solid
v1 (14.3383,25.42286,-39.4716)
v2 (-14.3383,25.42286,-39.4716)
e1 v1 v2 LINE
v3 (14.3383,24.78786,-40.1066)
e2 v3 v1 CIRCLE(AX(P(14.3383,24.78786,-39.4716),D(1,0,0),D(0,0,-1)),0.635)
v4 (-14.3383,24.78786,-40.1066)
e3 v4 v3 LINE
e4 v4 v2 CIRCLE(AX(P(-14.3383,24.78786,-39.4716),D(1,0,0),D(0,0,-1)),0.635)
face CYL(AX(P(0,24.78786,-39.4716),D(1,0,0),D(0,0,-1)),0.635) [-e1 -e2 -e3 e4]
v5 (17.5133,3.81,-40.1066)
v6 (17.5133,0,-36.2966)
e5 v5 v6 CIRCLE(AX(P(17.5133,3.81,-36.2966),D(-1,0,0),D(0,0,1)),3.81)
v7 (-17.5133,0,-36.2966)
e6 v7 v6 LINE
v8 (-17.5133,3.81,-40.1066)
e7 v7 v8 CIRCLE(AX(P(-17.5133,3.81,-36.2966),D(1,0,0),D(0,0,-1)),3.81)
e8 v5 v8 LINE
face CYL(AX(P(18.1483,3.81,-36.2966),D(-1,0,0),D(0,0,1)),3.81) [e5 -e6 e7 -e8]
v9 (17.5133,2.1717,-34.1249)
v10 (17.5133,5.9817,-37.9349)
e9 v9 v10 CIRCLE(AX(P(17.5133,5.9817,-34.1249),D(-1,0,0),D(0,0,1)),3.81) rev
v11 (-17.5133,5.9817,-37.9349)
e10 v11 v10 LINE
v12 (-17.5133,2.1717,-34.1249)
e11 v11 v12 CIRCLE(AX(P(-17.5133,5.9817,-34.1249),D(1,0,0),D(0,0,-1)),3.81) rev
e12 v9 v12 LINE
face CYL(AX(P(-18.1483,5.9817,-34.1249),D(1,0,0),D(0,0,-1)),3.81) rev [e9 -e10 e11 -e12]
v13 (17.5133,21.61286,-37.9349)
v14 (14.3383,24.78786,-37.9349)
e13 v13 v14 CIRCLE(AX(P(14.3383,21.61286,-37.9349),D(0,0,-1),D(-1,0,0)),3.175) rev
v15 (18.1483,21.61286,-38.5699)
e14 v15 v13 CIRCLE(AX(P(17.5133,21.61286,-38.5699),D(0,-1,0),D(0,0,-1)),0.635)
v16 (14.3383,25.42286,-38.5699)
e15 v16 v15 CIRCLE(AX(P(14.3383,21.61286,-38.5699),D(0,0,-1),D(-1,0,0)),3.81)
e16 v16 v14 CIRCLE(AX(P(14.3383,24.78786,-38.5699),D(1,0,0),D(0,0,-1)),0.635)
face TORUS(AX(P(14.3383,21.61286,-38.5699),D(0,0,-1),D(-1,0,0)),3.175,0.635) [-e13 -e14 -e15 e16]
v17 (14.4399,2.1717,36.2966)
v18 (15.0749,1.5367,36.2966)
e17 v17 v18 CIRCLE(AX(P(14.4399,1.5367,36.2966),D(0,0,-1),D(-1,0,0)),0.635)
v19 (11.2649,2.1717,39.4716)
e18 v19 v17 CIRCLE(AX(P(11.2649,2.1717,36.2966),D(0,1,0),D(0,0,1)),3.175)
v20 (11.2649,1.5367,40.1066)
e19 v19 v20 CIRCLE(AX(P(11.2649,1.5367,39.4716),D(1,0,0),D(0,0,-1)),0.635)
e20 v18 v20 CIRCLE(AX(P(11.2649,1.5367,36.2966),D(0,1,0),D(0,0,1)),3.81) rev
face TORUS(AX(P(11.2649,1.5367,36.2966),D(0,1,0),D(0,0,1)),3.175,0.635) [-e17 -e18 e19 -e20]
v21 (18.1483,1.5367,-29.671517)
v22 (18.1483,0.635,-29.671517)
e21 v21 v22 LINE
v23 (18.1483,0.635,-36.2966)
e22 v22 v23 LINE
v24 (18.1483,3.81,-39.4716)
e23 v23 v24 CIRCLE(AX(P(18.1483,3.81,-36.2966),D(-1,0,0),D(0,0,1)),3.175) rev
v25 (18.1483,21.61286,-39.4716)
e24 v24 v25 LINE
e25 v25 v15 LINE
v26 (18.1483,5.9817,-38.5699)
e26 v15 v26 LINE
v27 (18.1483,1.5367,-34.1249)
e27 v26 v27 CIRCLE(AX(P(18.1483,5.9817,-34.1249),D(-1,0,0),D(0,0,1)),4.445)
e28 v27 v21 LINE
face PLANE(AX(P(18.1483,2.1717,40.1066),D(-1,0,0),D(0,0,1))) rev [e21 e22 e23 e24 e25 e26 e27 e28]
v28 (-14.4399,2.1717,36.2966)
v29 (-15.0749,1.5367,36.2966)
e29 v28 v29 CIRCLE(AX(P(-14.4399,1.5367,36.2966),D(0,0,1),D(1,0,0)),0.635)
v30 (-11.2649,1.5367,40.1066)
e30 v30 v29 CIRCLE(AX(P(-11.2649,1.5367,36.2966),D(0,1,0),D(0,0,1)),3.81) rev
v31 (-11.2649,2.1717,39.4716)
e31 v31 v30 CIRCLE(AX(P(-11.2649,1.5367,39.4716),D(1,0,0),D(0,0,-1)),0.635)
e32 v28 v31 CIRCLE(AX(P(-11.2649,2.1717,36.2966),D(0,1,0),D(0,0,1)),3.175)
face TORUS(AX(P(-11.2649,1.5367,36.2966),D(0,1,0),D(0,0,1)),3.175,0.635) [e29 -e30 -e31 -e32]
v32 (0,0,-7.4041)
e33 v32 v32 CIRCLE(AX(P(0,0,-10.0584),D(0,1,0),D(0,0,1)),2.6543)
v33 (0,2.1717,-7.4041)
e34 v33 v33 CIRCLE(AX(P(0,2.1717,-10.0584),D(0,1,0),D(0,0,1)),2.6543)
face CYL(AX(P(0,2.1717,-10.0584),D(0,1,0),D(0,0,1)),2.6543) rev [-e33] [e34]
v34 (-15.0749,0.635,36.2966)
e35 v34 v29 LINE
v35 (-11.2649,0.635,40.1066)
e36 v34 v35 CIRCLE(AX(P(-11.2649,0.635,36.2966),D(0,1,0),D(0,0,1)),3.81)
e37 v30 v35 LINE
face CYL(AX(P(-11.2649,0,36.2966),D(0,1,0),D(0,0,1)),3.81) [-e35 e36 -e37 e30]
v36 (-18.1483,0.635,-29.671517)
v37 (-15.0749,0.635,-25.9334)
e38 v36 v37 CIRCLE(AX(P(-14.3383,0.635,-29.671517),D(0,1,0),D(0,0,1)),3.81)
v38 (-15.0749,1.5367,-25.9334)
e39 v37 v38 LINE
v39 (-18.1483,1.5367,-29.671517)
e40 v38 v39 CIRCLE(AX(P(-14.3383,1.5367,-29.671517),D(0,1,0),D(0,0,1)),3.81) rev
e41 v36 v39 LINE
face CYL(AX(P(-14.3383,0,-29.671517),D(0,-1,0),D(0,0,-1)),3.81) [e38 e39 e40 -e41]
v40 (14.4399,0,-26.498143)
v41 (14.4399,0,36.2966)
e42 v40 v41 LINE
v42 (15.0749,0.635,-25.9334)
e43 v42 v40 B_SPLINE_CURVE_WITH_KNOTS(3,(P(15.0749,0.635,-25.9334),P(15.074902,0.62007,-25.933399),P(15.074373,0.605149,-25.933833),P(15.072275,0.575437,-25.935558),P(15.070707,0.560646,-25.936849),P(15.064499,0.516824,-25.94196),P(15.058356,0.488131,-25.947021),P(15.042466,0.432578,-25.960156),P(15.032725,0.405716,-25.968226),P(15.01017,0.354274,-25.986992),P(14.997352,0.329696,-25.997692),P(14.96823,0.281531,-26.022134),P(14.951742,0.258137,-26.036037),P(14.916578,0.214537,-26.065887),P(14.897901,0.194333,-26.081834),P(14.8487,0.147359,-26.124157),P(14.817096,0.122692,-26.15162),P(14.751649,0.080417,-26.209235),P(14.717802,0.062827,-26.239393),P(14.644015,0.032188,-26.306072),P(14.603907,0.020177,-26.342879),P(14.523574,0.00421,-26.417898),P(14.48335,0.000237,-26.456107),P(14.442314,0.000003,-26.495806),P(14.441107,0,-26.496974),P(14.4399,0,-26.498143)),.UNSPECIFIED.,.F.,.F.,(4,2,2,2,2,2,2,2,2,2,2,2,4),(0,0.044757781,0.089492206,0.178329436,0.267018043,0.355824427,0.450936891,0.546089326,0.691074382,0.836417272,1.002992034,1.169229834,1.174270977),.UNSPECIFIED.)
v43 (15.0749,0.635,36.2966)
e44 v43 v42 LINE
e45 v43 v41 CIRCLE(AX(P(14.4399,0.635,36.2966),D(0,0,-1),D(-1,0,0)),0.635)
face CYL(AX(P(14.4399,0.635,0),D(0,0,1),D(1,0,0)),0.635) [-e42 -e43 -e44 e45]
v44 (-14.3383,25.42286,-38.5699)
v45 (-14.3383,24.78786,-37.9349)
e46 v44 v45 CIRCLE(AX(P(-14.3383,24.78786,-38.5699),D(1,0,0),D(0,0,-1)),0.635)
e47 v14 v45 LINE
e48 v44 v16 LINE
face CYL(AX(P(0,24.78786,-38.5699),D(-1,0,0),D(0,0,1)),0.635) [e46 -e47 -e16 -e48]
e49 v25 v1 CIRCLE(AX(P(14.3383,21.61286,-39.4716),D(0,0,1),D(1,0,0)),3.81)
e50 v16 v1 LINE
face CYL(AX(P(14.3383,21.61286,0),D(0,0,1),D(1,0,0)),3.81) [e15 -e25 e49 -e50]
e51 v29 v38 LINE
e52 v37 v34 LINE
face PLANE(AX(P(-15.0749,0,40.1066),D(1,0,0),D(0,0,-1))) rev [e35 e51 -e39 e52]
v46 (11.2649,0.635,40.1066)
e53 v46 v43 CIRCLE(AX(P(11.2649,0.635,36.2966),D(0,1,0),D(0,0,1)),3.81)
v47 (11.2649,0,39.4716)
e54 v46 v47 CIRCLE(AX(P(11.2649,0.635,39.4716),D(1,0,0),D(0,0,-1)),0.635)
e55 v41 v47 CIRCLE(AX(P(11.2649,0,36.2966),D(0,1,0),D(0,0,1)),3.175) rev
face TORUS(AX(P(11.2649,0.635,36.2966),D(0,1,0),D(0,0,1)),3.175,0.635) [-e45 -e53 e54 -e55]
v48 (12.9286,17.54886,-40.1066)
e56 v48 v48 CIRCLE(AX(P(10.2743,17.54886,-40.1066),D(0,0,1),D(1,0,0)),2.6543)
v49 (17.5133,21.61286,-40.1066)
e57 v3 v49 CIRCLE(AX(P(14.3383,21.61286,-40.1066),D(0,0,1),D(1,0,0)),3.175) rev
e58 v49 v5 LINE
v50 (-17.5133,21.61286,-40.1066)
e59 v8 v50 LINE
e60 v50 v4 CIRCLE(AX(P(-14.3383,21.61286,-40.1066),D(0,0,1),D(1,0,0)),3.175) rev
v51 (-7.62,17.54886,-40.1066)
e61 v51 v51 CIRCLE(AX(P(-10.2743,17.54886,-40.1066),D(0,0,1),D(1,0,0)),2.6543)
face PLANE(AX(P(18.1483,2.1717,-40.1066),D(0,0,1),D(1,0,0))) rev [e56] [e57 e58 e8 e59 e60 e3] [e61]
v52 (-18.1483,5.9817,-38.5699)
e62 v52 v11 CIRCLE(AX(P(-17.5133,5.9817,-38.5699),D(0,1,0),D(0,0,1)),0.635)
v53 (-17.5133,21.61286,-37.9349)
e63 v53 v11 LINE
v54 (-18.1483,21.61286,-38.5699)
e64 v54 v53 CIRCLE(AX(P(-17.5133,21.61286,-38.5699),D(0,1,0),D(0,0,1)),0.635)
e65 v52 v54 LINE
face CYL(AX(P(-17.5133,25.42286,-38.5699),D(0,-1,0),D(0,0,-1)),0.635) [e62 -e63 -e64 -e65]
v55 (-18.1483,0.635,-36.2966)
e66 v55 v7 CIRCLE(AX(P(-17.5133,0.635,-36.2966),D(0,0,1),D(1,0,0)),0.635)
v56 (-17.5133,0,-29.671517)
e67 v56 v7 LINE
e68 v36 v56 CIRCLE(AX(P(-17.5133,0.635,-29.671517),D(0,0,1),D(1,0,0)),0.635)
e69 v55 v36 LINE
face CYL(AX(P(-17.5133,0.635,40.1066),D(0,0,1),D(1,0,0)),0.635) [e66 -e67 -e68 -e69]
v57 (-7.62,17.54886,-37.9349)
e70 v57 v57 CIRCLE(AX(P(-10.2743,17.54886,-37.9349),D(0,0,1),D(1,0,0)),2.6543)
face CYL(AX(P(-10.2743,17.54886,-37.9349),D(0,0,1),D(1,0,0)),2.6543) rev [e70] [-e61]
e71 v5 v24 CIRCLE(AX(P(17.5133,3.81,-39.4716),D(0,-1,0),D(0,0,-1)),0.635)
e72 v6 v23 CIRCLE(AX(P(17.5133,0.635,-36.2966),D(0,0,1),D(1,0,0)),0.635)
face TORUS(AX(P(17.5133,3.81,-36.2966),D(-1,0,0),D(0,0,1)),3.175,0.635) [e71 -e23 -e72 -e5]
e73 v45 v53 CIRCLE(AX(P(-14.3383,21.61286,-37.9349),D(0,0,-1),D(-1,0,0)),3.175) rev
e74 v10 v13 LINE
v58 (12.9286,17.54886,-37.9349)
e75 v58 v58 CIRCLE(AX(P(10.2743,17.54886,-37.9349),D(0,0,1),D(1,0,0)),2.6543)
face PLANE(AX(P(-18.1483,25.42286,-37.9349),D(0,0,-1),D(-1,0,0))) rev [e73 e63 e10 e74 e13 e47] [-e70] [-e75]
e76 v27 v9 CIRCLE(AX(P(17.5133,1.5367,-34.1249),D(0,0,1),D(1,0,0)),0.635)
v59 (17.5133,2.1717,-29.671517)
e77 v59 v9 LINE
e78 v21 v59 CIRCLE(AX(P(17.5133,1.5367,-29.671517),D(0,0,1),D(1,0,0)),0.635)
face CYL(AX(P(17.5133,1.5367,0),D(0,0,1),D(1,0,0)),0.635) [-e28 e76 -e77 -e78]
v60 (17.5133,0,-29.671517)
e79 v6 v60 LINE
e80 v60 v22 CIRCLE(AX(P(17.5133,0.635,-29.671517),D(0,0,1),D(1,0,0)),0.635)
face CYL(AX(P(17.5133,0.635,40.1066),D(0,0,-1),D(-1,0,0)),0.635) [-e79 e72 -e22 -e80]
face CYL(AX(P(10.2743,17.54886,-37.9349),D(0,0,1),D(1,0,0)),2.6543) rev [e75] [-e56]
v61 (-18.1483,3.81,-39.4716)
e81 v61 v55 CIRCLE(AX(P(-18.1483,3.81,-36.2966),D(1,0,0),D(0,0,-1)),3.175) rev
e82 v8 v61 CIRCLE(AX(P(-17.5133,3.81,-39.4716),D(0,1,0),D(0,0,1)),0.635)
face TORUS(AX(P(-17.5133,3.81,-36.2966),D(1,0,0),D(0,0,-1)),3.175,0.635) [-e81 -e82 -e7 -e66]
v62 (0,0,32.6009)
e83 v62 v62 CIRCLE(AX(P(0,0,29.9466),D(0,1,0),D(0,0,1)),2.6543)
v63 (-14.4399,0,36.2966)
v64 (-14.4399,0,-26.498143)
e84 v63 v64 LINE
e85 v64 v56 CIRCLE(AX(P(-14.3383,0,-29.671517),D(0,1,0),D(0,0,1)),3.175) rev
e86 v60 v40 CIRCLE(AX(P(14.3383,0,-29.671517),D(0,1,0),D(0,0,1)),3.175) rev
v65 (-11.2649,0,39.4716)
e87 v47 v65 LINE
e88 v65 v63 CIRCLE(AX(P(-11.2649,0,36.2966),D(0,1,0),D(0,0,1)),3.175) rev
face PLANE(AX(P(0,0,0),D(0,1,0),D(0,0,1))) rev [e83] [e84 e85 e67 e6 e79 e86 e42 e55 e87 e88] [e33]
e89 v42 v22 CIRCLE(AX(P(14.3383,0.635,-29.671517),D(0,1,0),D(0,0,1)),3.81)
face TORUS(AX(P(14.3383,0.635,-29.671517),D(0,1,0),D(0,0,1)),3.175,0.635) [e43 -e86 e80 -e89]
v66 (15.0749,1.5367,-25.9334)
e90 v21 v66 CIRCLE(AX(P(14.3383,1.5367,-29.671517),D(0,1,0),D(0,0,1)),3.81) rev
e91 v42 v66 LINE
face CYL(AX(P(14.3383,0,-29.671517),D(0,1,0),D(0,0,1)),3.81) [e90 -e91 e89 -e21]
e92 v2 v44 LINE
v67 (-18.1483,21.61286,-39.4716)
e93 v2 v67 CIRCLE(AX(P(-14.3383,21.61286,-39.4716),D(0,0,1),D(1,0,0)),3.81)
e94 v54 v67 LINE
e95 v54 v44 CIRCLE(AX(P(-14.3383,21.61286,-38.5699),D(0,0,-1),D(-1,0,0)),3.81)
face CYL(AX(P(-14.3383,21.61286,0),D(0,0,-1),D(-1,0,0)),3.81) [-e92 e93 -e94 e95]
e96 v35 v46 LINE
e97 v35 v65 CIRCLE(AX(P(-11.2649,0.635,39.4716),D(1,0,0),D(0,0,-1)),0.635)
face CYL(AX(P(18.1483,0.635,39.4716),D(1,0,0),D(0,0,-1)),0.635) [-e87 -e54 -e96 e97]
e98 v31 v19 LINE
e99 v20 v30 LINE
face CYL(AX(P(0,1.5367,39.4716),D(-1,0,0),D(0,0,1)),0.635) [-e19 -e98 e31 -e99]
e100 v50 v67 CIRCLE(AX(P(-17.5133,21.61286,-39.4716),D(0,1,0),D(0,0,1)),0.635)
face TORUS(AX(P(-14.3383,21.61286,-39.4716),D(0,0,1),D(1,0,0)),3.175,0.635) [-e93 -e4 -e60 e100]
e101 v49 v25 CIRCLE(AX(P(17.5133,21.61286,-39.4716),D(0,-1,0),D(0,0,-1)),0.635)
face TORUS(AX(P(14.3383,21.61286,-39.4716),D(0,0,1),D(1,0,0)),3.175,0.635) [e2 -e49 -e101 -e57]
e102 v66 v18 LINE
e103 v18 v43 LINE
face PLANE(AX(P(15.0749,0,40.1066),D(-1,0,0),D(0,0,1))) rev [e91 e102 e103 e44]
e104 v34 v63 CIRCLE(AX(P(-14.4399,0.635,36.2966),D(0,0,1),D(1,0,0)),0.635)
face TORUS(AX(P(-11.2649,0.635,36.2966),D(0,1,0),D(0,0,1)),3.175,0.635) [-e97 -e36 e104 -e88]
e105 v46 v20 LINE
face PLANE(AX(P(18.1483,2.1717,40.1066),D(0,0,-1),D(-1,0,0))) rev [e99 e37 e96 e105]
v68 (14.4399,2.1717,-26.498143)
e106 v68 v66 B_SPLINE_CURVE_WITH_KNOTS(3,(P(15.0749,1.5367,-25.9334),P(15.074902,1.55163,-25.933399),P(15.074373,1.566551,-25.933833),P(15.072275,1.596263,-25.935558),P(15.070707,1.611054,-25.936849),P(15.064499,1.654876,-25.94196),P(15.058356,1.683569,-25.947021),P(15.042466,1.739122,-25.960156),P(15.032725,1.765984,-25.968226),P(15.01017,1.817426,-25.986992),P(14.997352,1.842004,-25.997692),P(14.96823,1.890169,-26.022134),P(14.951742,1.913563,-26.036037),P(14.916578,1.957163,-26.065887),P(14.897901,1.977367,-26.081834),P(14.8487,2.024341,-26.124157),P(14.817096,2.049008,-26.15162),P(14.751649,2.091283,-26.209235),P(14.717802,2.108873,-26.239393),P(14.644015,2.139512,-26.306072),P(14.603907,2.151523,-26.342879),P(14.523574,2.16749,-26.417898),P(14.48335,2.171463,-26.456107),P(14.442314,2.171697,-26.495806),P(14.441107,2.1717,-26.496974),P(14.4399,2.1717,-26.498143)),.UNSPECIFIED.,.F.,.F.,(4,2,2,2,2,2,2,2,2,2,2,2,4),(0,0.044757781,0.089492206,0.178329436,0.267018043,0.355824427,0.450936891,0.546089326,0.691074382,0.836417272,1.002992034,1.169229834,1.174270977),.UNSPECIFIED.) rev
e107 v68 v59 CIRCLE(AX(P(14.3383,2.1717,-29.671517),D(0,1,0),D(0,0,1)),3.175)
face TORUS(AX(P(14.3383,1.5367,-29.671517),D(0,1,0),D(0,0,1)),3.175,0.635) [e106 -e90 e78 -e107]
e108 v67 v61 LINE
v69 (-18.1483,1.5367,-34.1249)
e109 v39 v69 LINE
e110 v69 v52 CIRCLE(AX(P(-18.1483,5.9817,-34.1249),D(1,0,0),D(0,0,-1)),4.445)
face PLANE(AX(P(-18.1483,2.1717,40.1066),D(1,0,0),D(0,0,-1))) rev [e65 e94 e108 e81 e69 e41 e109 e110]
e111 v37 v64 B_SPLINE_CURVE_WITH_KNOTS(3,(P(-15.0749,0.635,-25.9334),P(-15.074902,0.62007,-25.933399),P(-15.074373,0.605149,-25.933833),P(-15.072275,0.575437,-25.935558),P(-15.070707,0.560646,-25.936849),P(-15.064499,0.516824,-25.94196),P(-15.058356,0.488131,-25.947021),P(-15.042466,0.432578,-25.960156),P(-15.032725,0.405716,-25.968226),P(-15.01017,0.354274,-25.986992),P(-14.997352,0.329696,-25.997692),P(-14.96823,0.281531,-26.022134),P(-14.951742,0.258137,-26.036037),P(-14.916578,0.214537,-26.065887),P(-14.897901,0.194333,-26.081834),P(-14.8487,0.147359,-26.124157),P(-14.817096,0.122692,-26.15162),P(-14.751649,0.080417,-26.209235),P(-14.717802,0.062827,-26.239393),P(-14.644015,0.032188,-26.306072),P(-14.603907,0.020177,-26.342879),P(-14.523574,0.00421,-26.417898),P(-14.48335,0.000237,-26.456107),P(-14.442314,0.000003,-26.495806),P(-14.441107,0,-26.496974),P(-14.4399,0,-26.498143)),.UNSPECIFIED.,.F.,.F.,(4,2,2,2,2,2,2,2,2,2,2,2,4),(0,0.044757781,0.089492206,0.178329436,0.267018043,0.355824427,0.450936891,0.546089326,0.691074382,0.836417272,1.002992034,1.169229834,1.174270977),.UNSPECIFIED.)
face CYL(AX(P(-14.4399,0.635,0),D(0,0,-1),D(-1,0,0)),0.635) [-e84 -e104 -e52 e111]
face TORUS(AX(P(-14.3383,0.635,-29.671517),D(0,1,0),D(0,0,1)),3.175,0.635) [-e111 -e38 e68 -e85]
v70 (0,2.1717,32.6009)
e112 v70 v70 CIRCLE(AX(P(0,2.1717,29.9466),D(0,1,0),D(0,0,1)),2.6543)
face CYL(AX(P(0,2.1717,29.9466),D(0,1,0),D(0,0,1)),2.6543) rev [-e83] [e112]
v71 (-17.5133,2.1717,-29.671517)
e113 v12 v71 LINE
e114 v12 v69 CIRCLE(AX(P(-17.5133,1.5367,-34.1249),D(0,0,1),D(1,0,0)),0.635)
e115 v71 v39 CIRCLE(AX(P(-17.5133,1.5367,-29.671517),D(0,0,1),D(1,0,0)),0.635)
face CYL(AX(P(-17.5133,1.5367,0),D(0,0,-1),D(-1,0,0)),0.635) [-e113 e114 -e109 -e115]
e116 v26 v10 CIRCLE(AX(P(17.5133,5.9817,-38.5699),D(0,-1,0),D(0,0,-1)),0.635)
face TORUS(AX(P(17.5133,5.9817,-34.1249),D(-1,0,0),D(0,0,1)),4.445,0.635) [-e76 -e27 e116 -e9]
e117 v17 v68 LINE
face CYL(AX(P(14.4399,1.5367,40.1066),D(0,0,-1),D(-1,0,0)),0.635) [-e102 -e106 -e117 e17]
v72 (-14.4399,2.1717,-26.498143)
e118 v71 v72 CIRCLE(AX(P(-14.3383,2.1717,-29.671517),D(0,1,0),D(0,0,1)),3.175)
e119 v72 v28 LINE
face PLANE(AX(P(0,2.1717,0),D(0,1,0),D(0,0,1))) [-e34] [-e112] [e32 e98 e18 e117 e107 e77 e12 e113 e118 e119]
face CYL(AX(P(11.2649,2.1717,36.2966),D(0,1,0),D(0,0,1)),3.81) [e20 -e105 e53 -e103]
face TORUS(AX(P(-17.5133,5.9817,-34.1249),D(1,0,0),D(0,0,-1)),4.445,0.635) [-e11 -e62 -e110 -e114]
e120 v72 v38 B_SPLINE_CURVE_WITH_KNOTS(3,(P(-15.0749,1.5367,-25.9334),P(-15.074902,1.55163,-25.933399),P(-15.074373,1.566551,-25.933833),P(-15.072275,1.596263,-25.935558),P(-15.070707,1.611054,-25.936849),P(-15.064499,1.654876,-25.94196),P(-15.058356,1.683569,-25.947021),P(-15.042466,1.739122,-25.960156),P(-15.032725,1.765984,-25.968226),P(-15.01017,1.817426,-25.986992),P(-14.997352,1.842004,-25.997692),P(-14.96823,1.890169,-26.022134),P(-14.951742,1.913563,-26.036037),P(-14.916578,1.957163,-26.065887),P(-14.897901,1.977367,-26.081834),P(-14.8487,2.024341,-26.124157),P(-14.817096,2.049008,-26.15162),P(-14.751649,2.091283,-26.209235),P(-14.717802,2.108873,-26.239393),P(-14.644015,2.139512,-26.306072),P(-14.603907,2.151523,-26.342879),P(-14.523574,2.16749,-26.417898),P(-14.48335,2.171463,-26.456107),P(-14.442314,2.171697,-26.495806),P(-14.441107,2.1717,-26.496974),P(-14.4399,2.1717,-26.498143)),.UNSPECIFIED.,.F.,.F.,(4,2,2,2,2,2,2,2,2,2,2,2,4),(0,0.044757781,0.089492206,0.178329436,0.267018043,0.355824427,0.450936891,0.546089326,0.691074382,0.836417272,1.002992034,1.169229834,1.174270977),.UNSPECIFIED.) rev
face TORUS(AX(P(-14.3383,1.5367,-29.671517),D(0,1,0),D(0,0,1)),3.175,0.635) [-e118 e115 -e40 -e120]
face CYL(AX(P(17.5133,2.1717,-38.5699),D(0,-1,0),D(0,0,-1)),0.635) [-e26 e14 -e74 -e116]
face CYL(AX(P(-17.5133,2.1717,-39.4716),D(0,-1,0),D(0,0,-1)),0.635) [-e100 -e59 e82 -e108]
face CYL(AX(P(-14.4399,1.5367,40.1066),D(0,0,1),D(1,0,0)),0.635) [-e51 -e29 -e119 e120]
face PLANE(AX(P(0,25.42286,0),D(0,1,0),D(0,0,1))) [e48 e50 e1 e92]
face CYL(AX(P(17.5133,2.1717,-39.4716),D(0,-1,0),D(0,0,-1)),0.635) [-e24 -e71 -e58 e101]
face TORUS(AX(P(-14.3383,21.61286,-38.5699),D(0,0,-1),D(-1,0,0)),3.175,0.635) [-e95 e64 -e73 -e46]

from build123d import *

# Parameters (mm, degrees)
SKETCH1_W                  = 36.2966
SKETCH1_H                  = 80.2132
BOSS_BASE_DEPTH            = 2.1717
SKETCH3_W                  = 36.2966
SKETCH3_H                  = 2.1717
BOSS_LIP_DEPTH             = 23.25116
F_4_0_209_DIAMETER_HOLE1_D = 5.3086
F_4_0_209_DIAMETER_HOLE2_D = 5.3086
SKETCH19_W                 = 3.0734
SKETCH19_H                 = 66.04
CUT_EXTRUDE1_DEPTH         = 50.784702448
FILLET1_R                  = 3.81
FILLET4_R                  = 0.635


with BuildPart() as part:
    # Sketch1 → Boss-Base (new body)
    with BuildSketch(Plane(origin=(0, 0, 0), x_dir=(1, 0, 0), z_dir=(0, 1, 0))):
        Rectangle(SKETCH1_W, SKETCH1_H)
    extrude(amount=BOSS_BASE_DEPTH)

    # Sketch3 → Boss-Lip (add)
    with BuildSketch(Plane(origin=(0, 2.1717, 0), x_dir=(1, 0, 0), z_dir=(0, 1, 0))):
        with Locations((0, 39.02075)):
            Rectangle(SKETCH3_W, SKETCH3_H)
    extrude(amount=BOSS_LIP_DEPTH)

    # #4 (0.209) Diameter Hole1 (through all)
    with Locations(Plane(origin=(0, 2.1717, 0), x_dir=(1, 0, 0), z_dir=(0, 1, 0))):
        with Locations((0, -29.9466), (0, 10.0584)):
            Hole(F_4_0_209_DIAMETER_HOLE1_D / 2)

    # #4 (0.209) Diameter Hole2 (through all)
    with Locations(Plane.XY.offset(-37.9349)):
        with Locations((10.2743, 17.54886), (-10.2743, 17.54886)):
            Hole(F_4_0_209_DIAMETER_HOLE2_D / 2)

    # Sketch19 → Cut-Extrude1 (cut, through all)
    with BuildSketch(Plane(origin=(0, 2.1717, 0), x_dir=(1, 0, 0), z_dir=(0, 1, 0))):
        with Locations((16.6116, -7.0866)):
            Rectangle(SKETCH19_W, SKETCH19_H)
        with Locations((-16.6116, -7.0866)):
            Rectangle(SKETCH19_W, SKETCH19_H)
    extrude(amount=-CUT_EXTRUDE1_DEPTH, mode=Mode.SUBTRACT)

    # Fillet1
    # the kernel refuses this fillet: 3.81 mm, written as the material it adds along each edge
    with BuildSketch(Plane(origin=(18.1483, 2.1717, -37.9349), x_dir=(0, 0, 1), z_dir=(-1, 0, 0))) as fillet1_piece_1:
        with BuildLine():
            CenterArc((FILLET1_R, FILLET1_R), FILLET1_R, 180, 90)
            Line((0, FILLET1_R), (0, 0))
            Line((0, 0), (FILLET1_R, 0))
        make_face()
    extrude(amount=36.2966)
    # the kernel refuses this fillet: 3.81 mm, written as the material it takes off along each edge
    with BuildSketch(Plane(origin=(-18.1483, 11.51699308, -25.9334), x_dir=(0, 0, -1), z_dir=(0, -1, 0))) as fillet1_2_piece_1:
        with BuildLine():
            CenterArc((3.738117232, 3.81), FILLET1_R, 191.147377986, 78.852622014)
            Line((0, 3.0734), (0, 0))
            Line((0, 0), (3.738117232, 0))
        make_face()
    extrude(amount=20.86228616, mode=Mode.SUBTRACT)
    with BuildSketch(Plane(origin=(18.1483, 11.51699308, -25.9334), x_dir=(-1, 0, 0), z_dir=(0, -1, 0))) as fillet1_2_piece_2:
        with BuildLine():
            CenterArc((3.81, 3.738117232), FILLET1_R, 180, 78.852622014)
            Line((0, 3.738117232), (0, 0))
            Line((0, 0), (3.0734, 0))
        make_face()
    extrude(amount=20.86228616, mode=Mode.SUBTRACT)
    with BuildSketch(Plane(origin=(15.0749, 11.6967, 40.1066), x_dir=(-1, 0, 0), z_dir=(0, -1, 0))) as fillet1_2_piece_3:
        with BuildLine():
            CenterArc((FILLET1_R, FILLET1_R), FILLET1_R, 180, 90)
            Line((0, FILLET1_R), (0, 0))
            Line((0, 0), (FILLET1_R, 0))
        make_face()
    extrude(amount=21.2217, mode=Mode.SUBTRACT)
    with BuildSketch(Plane(origin=(-15.0749, 11.6967, 40.1066), x_dir=(1, 0, 0), z_dir=(0, -1, 0)), Plane(origin=(-18.1483, 25.42286, -28.4099), x_dir=(0, -1, 0), z_dir=(0, 0, -1)), Plane(origin=(18.1483, 25.42286, -49.6316), x_dir=(0, -1, 0), z_dir=(0, 0, 1))) as fillet1_2_piece_4:
        with BuildLine():
            CenterArc((FILLET1_R, -FILLET1_R), FILLET1_R, 90, 90)
            Line((0, -FILLET1_R), (0, 0))
            Line((0, 0), (FILLET1_R, 0))
        make_face()
    extrude(amount=21.2217, mode=Mode.SUBTRACT)
    with BuildSketch(Plane(origin=(-27.6733, 0, -40.1066), x_dir=(0, 0, 1), z_dir=(1, 0, 0))) as fillet1_2_piece_5:
        with BuildLine():
            CenterArc((FILLET1_R, -FILLET1_R), FILLET1_R, 90, 90)
            Line((0, -FILLET1_R), (0, 0))
            Line((0, 0), (FILLET1_R, 0))
        make_face()
    extrude(amount=55.3466, mode=Mode.SUBTRACT)

    # Fillet4
    fillet4_edges = [part.edges().sort_by_distance(p)[0] for p in [
        (18.1483, 3.287623164, -36.818976836),
        (-18.1483, 3.287623164, -36.818976836),
        (15.0749, 0, 5.1816),
        (15.0749, 2.1717, 5.1816),
        (18.1483, 13.79728, -37.9349),
        (0, 25.42286, -37.9349),
        (-18.1483, 13.79728, -37.9349),
        (17.032376836, 24.306936836, -37.9349),
        (-17.032376836, 24.306936836, -37.9349),
        (18.1483, 2.1717, -31.898208616),
        (-18.1483, 2.1717, -31.898208616),
        (-15.0749, 2.1717, 5.1816),
        (0, 2.1717, 40.1066),
        (-17.281304077, 2.1717, -27.251842254),
        (17.281304077, 2.1717, -27.251842254),
        (13.958976836, 2.1717, 38.990676836),
        (-13.958976836, 2.1717, 38.990676836),
        (-18.1483, 12.71143, -40.1066),
        (0, 25.42286, -40.1066),
        (18.1483, 12.71143, -40.1066),
        (17.032376836, 24.306936836, -40.1066),
        (-17.032376836, 24.306936836, -40.1066),
        (-18.1483, 0, -32.984058616),
        (-18.1483, 1.115923164, -38.990676836),
        (0, 0, 40.1066),
        (-15.0749, 0, 5.1816),
        (18.1483, 0, -32.984058616),
        (-17.281304077, 0, -27.251842254),
        (17.281304077, 0, -27.251842254),
        (13.958976836, 0, 38.990676836),
        (-13.958976836, 0, 38.990676836),
        (18.1483, 1.115923164, -38.990676836),
    ]]
    fillet(fillet4_edges, radius=FILLET4_R)


solid = part.part
